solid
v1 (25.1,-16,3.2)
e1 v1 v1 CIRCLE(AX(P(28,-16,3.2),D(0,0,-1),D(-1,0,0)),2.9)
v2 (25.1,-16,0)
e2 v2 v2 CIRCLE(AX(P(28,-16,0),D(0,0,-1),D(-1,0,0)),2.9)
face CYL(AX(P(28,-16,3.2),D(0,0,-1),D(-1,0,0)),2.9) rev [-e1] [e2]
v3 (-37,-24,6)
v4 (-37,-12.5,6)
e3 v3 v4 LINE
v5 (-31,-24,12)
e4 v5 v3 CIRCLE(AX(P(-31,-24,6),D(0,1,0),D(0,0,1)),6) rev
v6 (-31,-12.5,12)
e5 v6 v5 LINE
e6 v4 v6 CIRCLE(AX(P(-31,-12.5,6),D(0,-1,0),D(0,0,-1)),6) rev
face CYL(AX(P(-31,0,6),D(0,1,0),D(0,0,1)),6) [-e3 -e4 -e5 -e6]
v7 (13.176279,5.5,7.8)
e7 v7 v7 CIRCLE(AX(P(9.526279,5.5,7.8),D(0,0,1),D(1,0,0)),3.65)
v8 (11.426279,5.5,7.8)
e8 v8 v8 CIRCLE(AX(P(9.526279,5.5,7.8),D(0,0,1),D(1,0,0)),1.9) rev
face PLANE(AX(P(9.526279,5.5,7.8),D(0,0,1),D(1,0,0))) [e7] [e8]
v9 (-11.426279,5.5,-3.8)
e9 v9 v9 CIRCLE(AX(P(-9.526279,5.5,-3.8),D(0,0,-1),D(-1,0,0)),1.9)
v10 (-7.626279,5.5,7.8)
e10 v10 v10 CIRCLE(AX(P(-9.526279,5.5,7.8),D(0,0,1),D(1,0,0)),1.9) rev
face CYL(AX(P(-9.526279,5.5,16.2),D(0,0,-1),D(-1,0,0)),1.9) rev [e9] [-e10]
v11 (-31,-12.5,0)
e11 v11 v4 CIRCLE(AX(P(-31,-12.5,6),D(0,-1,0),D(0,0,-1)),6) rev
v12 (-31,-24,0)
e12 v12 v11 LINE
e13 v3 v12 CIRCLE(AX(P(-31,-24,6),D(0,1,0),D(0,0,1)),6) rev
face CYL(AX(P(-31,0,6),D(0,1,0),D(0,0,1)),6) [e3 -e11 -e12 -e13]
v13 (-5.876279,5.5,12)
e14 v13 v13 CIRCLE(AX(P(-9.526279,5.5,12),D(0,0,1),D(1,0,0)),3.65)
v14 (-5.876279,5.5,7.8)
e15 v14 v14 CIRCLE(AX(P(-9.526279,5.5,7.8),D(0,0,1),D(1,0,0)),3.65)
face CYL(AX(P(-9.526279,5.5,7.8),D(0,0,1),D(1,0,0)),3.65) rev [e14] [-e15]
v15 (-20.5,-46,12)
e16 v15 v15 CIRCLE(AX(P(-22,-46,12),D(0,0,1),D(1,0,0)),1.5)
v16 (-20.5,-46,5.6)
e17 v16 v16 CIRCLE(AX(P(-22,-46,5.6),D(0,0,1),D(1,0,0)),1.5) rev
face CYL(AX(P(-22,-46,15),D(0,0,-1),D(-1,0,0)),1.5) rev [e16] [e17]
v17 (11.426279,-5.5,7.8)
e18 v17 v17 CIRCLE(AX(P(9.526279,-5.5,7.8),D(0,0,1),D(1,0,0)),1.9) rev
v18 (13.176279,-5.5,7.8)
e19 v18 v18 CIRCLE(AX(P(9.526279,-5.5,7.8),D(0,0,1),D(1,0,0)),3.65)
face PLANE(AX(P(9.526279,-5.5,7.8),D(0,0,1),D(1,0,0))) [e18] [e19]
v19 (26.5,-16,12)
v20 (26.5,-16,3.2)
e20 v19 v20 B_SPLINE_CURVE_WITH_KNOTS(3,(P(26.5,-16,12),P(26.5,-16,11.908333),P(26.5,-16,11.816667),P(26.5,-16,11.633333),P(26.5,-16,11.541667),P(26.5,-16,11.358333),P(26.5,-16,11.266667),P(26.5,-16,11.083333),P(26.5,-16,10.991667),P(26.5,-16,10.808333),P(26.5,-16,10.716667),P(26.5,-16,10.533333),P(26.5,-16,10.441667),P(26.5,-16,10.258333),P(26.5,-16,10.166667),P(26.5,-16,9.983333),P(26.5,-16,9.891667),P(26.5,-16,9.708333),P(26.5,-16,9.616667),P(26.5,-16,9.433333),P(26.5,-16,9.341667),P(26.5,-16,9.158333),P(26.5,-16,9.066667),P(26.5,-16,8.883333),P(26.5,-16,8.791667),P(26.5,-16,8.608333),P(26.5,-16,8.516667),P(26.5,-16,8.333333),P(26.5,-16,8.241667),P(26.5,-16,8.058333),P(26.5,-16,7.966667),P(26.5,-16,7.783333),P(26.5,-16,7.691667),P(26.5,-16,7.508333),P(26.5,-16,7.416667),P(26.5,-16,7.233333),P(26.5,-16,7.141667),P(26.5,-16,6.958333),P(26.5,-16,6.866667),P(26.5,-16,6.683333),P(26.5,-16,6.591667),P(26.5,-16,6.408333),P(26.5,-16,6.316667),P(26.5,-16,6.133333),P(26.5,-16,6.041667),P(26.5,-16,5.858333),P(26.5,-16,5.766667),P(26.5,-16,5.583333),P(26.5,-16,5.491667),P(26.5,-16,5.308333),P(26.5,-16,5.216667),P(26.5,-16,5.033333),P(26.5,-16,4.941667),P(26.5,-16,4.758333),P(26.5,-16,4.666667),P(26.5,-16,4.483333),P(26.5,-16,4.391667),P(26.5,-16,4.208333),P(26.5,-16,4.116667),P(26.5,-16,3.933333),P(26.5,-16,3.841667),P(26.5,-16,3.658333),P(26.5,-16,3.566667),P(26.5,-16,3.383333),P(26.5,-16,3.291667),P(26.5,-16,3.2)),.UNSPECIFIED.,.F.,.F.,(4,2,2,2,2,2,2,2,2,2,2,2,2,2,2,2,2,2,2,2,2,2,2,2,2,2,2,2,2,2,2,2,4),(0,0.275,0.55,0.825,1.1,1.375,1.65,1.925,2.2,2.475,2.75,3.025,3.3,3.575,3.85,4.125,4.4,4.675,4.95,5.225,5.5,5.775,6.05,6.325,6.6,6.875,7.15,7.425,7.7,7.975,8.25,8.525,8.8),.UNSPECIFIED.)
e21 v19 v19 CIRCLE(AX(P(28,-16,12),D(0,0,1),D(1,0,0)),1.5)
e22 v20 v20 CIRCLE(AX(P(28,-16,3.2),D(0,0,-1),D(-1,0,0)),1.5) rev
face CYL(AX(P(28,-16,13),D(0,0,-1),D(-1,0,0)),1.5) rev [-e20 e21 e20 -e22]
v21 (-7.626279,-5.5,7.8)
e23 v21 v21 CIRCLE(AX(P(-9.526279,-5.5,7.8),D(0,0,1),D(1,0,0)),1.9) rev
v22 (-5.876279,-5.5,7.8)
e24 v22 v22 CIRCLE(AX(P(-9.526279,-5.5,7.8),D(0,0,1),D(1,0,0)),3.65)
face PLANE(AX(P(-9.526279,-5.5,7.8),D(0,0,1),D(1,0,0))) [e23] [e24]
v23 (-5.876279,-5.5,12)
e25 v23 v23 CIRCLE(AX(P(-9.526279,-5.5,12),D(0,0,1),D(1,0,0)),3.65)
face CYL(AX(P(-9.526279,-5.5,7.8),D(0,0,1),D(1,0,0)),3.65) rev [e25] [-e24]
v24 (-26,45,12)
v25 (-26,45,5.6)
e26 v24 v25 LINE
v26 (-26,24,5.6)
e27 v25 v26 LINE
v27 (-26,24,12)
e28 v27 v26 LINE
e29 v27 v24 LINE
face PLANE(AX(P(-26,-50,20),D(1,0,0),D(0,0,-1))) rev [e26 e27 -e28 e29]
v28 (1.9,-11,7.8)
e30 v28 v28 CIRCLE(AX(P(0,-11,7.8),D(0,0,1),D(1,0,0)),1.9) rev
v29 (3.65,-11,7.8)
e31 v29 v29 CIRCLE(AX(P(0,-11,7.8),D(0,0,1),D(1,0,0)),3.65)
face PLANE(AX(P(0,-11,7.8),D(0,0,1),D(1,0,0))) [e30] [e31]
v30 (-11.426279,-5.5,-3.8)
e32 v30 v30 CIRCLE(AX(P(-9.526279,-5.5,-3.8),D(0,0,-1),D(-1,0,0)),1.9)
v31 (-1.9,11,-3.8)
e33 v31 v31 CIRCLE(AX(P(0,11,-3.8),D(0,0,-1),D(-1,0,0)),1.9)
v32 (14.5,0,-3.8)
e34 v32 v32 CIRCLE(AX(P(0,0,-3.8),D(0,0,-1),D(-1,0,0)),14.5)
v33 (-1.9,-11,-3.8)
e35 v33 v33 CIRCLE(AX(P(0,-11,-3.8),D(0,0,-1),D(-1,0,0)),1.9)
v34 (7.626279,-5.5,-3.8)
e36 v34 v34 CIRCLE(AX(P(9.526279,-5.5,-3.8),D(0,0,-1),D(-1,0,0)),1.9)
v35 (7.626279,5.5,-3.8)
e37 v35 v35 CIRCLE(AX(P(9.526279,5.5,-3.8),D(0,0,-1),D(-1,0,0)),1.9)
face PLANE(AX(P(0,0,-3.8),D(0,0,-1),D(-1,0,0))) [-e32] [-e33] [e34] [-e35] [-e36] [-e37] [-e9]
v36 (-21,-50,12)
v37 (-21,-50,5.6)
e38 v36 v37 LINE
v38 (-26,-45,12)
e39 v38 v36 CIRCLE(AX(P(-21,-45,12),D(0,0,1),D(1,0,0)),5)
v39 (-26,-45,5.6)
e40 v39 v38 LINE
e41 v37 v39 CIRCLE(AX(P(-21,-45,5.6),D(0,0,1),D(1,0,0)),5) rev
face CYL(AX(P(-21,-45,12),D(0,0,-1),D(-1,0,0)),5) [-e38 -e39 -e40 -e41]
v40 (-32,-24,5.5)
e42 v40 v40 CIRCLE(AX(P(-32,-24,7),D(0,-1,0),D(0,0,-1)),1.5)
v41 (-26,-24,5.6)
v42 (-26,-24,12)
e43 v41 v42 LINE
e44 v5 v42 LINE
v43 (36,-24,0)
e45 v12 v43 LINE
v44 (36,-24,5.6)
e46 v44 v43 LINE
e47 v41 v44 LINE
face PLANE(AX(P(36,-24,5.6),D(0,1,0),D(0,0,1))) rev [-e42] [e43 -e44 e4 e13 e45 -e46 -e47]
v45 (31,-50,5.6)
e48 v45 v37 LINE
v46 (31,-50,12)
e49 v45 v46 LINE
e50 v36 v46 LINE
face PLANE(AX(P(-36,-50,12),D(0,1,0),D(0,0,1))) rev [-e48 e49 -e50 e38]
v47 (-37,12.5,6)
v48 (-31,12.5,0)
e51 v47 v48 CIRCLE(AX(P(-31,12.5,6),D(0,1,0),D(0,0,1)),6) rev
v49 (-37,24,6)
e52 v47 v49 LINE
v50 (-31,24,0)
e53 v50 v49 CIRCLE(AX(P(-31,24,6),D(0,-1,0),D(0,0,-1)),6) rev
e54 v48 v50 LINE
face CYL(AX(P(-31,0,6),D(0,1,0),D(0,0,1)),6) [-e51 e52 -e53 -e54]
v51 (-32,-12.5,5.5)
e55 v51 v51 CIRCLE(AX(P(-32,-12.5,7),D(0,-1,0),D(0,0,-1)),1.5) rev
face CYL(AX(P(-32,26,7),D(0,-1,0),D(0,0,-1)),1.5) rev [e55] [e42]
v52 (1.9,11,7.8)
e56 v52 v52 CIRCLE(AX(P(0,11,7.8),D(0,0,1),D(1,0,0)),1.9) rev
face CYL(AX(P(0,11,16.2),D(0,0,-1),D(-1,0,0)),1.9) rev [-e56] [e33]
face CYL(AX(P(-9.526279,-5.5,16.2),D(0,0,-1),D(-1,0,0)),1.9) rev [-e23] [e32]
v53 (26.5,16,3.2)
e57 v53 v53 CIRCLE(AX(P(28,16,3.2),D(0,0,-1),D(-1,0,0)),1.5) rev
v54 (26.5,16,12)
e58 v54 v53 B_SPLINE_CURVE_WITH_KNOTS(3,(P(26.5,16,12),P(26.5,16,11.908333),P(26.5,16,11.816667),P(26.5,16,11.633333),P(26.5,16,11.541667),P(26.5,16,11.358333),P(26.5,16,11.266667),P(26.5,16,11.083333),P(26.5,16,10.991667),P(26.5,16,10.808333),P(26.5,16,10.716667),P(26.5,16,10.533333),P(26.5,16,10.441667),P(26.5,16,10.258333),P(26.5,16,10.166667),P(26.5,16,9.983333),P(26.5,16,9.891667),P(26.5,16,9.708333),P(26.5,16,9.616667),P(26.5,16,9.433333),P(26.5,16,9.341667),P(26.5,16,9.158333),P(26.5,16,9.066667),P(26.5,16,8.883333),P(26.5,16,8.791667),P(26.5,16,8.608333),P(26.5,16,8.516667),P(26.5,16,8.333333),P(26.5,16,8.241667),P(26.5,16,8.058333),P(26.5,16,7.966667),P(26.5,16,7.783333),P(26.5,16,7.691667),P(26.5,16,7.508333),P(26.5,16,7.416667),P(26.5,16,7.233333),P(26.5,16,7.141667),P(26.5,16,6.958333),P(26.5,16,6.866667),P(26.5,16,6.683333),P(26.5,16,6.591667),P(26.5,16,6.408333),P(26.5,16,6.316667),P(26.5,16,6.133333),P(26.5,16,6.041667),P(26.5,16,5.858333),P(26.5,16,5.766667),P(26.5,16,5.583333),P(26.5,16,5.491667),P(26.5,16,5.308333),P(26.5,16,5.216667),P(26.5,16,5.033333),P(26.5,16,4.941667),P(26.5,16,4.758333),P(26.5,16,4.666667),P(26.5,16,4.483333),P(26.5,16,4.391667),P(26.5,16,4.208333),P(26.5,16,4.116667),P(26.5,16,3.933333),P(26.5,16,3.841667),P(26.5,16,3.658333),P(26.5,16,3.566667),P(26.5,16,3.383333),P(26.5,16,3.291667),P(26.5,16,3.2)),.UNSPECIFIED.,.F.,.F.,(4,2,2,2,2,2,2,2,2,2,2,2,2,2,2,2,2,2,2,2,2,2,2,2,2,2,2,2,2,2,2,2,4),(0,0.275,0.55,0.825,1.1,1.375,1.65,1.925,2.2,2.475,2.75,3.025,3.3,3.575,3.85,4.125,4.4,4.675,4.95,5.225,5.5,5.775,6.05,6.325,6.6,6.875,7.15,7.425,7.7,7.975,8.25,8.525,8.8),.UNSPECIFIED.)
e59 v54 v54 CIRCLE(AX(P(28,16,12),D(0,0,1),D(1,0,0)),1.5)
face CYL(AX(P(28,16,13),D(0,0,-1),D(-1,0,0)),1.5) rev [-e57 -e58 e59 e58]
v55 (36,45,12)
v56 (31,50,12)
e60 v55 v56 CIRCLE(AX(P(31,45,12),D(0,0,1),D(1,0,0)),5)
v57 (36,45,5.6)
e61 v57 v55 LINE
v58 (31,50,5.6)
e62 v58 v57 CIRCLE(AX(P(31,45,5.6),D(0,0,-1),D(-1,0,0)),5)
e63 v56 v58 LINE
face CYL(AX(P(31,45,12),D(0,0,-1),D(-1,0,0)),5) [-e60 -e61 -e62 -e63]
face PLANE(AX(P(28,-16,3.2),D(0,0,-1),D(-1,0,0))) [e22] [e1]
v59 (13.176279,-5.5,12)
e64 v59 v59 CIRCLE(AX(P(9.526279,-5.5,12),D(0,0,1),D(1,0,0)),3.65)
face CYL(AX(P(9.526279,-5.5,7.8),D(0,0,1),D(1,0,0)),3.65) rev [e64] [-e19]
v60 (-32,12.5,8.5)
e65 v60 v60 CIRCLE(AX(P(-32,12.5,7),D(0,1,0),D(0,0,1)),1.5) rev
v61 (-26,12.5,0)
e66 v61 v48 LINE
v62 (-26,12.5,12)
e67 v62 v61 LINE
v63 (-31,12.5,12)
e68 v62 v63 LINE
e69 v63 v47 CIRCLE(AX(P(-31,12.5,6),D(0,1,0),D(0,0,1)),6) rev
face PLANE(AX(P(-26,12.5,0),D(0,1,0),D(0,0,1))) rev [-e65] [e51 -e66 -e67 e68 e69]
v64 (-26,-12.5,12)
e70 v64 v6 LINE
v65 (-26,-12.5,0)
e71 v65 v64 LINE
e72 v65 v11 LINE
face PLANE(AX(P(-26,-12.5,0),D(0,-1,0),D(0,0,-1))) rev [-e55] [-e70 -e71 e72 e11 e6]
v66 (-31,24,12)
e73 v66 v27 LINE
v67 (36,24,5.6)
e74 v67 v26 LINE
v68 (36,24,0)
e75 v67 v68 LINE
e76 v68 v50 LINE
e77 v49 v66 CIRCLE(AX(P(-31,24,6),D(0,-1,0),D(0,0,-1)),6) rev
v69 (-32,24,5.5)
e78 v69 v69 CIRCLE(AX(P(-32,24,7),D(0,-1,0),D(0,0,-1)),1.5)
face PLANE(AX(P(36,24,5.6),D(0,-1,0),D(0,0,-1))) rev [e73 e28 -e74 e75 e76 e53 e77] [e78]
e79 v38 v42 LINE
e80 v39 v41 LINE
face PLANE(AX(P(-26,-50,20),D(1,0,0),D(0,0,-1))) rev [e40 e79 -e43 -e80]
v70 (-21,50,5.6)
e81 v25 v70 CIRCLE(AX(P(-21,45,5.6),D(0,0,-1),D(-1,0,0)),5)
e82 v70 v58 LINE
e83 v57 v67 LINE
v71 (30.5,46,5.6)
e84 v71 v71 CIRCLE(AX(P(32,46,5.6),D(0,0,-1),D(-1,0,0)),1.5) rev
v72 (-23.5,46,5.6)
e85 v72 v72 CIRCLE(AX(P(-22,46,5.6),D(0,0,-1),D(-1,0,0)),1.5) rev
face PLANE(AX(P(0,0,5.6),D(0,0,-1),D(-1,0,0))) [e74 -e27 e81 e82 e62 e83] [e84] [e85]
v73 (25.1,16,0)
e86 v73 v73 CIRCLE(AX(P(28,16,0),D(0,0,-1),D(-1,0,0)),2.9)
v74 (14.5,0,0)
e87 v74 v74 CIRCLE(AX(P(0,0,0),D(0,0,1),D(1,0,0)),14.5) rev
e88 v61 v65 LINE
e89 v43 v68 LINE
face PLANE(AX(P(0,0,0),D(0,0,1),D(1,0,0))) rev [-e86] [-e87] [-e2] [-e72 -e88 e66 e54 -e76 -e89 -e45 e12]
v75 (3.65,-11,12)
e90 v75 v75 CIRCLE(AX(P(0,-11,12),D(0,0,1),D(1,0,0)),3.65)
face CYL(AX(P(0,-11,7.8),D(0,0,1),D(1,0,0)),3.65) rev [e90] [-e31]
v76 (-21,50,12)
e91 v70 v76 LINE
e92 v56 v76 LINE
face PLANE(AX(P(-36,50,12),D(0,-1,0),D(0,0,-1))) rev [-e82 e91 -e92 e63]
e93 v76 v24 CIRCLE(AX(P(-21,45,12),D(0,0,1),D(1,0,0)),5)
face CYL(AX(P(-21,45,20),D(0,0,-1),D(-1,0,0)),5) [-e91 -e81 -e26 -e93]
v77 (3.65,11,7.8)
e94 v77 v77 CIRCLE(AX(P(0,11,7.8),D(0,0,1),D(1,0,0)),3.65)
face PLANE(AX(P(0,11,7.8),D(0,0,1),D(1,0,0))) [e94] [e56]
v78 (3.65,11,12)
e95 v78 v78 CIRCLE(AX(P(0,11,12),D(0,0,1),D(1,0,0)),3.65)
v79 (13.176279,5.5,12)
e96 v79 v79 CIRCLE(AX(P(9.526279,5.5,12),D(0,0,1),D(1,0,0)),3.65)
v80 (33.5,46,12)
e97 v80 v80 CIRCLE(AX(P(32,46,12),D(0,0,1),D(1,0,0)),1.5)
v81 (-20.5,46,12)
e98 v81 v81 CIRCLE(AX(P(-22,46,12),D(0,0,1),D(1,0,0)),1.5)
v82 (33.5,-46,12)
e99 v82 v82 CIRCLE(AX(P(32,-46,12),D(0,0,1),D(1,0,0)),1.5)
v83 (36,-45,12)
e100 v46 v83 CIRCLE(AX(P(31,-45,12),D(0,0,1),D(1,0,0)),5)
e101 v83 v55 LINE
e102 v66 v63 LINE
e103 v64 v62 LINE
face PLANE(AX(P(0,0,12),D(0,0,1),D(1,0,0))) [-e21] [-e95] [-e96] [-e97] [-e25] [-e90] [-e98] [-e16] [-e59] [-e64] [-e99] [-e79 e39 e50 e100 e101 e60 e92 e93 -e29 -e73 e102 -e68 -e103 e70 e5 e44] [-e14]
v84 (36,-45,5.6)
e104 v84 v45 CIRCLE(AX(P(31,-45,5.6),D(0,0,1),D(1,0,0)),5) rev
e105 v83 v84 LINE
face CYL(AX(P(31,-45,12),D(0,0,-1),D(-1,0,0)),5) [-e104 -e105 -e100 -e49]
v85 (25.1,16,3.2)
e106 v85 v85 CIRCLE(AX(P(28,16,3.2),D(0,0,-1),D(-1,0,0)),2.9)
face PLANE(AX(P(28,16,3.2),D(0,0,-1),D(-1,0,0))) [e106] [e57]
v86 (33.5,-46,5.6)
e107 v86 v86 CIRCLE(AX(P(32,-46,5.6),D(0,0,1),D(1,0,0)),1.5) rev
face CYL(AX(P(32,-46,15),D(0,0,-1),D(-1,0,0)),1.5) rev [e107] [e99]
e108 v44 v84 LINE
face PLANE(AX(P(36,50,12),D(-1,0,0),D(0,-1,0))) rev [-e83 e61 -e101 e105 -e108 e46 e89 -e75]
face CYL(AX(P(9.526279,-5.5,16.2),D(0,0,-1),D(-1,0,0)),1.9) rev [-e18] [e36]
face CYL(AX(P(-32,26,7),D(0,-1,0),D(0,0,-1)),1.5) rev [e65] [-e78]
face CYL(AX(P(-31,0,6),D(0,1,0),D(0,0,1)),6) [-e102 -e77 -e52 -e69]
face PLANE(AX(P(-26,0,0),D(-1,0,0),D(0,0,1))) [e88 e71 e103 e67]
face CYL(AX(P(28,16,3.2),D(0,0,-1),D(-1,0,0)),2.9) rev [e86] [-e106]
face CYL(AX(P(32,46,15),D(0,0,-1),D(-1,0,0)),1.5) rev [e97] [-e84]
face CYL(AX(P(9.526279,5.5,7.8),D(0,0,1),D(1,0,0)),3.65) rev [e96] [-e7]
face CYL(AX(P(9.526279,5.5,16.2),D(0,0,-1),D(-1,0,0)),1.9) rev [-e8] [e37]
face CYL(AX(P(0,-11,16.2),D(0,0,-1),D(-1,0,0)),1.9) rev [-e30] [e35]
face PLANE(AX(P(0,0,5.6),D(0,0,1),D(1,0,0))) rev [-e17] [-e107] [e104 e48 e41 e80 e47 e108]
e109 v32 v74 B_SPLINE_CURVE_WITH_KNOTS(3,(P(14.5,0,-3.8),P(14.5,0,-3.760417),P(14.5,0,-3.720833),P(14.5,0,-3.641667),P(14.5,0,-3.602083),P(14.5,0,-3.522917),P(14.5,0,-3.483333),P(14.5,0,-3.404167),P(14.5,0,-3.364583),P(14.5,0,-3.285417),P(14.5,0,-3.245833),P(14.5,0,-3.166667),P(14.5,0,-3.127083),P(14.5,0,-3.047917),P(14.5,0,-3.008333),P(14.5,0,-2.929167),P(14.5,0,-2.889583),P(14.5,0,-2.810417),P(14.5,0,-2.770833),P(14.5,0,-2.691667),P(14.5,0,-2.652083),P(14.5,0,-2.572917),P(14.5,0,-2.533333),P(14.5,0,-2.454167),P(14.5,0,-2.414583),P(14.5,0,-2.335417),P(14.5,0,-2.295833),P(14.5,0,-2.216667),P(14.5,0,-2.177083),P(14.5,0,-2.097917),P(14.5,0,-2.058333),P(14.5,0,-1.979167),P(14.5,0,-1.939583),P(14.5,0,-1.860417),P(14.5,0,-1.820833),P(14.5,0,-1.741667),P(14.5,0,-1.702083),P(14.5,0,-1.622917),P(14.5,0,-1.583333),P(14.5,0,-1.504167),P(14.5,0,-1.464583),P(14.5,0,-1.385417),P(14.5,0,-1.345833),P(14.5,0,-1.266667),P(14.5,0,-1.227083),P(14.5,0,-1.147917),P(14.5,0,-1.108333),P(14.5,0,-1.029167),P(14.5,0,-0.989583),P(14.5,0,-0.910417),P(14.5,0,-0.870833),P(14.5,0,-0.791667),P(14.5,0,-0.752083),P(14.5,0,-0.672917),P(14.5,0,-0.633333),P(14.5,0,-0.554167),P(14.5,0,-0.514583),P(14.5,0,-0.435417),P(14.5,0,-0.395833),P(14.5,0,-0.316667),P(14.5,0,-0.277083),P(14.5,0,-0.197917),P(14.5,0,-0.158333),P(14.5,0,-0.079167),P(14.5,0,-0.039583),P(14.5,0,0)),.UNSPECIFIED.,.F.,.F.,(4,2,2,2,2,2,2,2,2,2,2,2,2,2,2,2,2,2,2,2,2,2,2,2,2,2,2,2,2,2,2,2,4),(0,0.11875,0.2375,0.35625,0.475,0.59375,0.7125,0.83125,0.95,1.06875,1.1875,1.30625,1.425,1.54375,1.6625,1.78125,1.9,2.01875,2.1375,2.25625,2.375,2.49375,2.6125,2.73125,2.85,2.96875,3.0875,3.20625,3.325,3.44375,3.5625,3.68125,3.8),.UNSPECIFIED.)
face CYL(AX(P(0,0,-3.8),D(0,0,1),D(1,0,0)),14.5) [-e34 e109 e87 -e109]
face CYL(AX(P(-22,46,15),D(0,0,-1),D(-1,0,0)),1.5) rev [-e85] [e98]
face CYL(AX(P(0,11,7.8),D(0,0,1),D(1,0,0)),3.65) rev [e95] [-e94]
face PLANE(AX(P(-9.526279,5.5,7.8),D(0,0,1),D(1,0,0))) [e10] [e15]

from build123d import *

# Parameters (mm, degrees)
SKETCH_1_W           = 72
SKETCH_1_H           = 100
EXTRUDE_1_DEPTH      = 12
SKETCH_2_R           = 1.5
CUT_EXTRUDE_1_DEPTH  = 13
SKETCH_4_R           = 1.5
CUT_EXTRUDE_3_DEPTH  = 15
SKETCH_5_R           = 14.5
EXTRUDE_2_DEPTH      = 3.8
SKETCH_6_R           = 1.9
CUT_EXTRUDE_6_DEPTH  = 20
SKETCH_7_R           = 3.65
CUT_EXTRUDE_7_DEPTH  = 4.2
SKETCH_8_R           = 2.9
CUT_EXTRUDE_8_DEPTH  = 3.2
SKETCH_9_W           = 72
SKETCH_9_H           = 26
CUT_EXTRUDE_9_DEPTH  = 5.6
FILLET_1_R           = 5
SKETCH_10_W          = 10
SKETCH_10_H          = 100
CUT_EXTRUDE_10_DEPTH = 20
SKETCH_11_W          = 12
SKETCH_11_H          = 48
EXTRUDE_3_DEPTH      = 11
SKETCH_12_R          = 1.5
CUT_EXTRUDE_11_DEPTH = 50
SKETCH_14_W          = 12
SKETCH_14_H          = 25
CUT_EXTRUDE_12_DEPTH = 11
FILLET_2_R           = 6
FILLET_3_R           = 5


with BuildPart() as part:
    # 草图1 → 凸台-拉伸1 (new body)
    with BuildSketch(Plane.XY):
        Rectangle(SKETCH_1_W, SKETCH_1_H)
    extrude(amount=EXTRUDE_1_DEPTH)

    # 草图2 → 切除-拉伸1 (cut)
    with BuildSketch(Plane(origin=(0, 0, 0), x_dir=(-1, 0, 0), z_dir=(0, 0, -1))):
        with Locations((-28, 16)):
            Circle(SKETCH_2_R)
        with Locations((-28, -16)):
            Circle(SKETCH_2_R)
    extrude(amount=-CUT_EXTRUDE_1_DEPTH, mode=Mode.SUBTRACT)

    # 草图4 → 切除-拉伸3 (cut)
    with BuildSketch(Plane(origin=(0, 0, 0), x_dir=(-1, 0, 0), z_dir=(0, 0, -1))):
        with Locations((-32, 46)):
            Circle(SKETCH_4_R)
        with Locations((22, 46)):
            Circle(SKETCH_4_R)
        with Locations((-32, -46)):
            Circle(SKETCH_4_R)
        with Locations((22, -46)):
            Circle(SKETCH_4_R)
    extrude(amount=-CUT_EXTRUDE_3_DEPTH, mode=Mode.SUBTRACT)

    # 草图5 → 凸台-拉伸2 (add)
    with BuildSketch(Plane(origin=(0, 0, 0), x_dir=(-1, 0, 0), z_dir=(0, 0, -1))):
        with Locations(Location((0, 0, 0), (0, 0, 180))):
            Circle(SKETCH_5_R)
    extrude(amount=EXTRUDE_2_DEPTH)

    # 草图6 → 切除-拉伸6 (cut)
    with BuildSketch(Plane(origin=(0, 0, -3.8), x_dir=(-1, 0, 0), z_dir=(0, 0, -1))):
        with Locations((0, 11)):
            Circle(SKETCH_6_R)
        with Locations((9.526279442, 5.5)):
            Circle(SKETCH_6_R)
        with Locations((9.526279442, -5.5)):
            Circle(SKETCH_6_R)
        with Locations((0, -11)):
            Circle(SKETCH_6_R)
        with Locations((-9.526279442, -5.5)):
            Circle(SKETCH_6_R)
        with Locations((-9.526279442, 5.5)):
            Circle(SKETCH_6_R)
    extrude(amount=-CUT_EXTRUDE_6_DEPTH, mode=Mode.SUBTRACT)

    # 草图7 → 切除-拉伸7 (cut)
    with BuildSketch(Plane.XY.offset(12)):
        with Locations((0, 11)):
            Circle(SKETCH_7_R)
        with Locations((9.526279442, 5.5)):
            Circle(SKETCH_7_R)
        with Locations((9.526279442, -5.5)):
            Circle(SKETCH_7_R)
        with Locations((0, -11)):
            Circle(SKETCH_7_R)
        with Locations((-9.526279442, -5.5)):
            Circle(SKETCH_7_R)
        with Locations((-9.526279442, 5.5)):
            Circle(SKETCH_7_R)
    extrude(amount=-CUT_EXTRUDE_7_DEPTH, mode=Mode.SUBTRACT)

    # 草图8 → 切除-拉伸8 (cut)
    with BuildSketch(Plane(origin=(0, 0, 0), x_dir=(-1, 0, 0), z_dir=(0, 0, -1))):
        with Locations((-28, 16)):
            Circle(SKETCH_8_R)
        with Locations((-28, -16)):
            Circle(SKETCH_8_R)
    extrude(amount=-CUT_EXTRUDE_8_DEPTH, mode=Mode.SUBTRACT)

    # 草图9 → 切除-拉伸9 (cut)
    with BuildSketch(Plane(origin=(0, 0, 0), x_dir=(-1, 0, 0), z_dir=(0, 0, -1))):
        with Locations((0, 37)):
            Rectangle(SKETCH_9_W, SKETCH_9_H)
        with Locations((0, -37)):
            Rectangle(SKETCH_9_W, SKETCH_9_H)
    extrude(amount=-CUT_EXTRUDE_9_DEPTH, mode=Mode.SUBTRACT)

    # 圆角1
    fillet_1_edges = [part.edges().sort_by_distance(p)[0] for p in [
        (36, -50, 8.8),
        (-36, -50, 8.8),
        (-36, 50, 8.8),
        (36, 50, 8.8),
    ]]
    fillet(fillet_1_edges, radius=FILLET_1_R)

    # 草图10 → 切除-拉伸10 (cut)
    with BuildSketch(Plane(origin=(0, 0, 0), x_dir=(-1, 0, 0), z_dir=(0, 0, -1))):
        with Locations((31, 0)):
            Rectangle(SKETCH_10_W, SKETCH_10_H)
    extrude(amount=-CUT_EXTRUDE_10_DEPTH, mode=Mode.SUBTRACT)

    # 草图11 → 凸台-拉伸3 (add)
    with BuildSketch(Plane.ZY.offset(26)):
        with Locations((6, 0)):
            Rectangle(SKETCH_11_W, SKETCH_11_H)
    extrude(amount=EXTRUDE_3_DEPTH)

    # 草图12 → 切除-拉伸11 (cut)
    with BuildSketch(Plane.XZ.offset(24)):
        with Locations(Location((-32, 7, 0), (0, 0, 270))):
            Circle(SKETCH_12_R)
    extrude(amount=-CUT_EXTRUDE_11_DEPTH, mode=Mode.SUBTRACT)

    # 草图14 → 切除-拉伸12 (cut)
    with BuildSketch(Plane.ZY.offset(37)):
        with Locations((6, 0)):
            Rectangle(SKETCH_14_W, SKETCH_14_H)
    extrude(amount=-CUT_EXTRUDE_12_DEPTH, mode=Mode.SUBTRACT)

    # 圆角2
    fillet_2_edges = [part.edges().sort_by_distance(p)[0] for p in [
        (-37, 18.25, 0),
        (-37, 18.25, 12),
        (-37, -18.25, 0),
        (-37, -18.25, 12),
    ]]
    fillet(fillet_2_edges, radius=FILLET_2_R - 0.0001)  # a hair under: the kernel refuses the full size

    # 圆角3
    fillet_3_edges = [part.edges().sort_by_distance(p)[0] for p in [
        (-26, -50, 8.8),
        (-26, 50, 8.8),
    ]]
    fillet(fillet_3_edges, radius=FILLET_3_R)


solid = part.part
